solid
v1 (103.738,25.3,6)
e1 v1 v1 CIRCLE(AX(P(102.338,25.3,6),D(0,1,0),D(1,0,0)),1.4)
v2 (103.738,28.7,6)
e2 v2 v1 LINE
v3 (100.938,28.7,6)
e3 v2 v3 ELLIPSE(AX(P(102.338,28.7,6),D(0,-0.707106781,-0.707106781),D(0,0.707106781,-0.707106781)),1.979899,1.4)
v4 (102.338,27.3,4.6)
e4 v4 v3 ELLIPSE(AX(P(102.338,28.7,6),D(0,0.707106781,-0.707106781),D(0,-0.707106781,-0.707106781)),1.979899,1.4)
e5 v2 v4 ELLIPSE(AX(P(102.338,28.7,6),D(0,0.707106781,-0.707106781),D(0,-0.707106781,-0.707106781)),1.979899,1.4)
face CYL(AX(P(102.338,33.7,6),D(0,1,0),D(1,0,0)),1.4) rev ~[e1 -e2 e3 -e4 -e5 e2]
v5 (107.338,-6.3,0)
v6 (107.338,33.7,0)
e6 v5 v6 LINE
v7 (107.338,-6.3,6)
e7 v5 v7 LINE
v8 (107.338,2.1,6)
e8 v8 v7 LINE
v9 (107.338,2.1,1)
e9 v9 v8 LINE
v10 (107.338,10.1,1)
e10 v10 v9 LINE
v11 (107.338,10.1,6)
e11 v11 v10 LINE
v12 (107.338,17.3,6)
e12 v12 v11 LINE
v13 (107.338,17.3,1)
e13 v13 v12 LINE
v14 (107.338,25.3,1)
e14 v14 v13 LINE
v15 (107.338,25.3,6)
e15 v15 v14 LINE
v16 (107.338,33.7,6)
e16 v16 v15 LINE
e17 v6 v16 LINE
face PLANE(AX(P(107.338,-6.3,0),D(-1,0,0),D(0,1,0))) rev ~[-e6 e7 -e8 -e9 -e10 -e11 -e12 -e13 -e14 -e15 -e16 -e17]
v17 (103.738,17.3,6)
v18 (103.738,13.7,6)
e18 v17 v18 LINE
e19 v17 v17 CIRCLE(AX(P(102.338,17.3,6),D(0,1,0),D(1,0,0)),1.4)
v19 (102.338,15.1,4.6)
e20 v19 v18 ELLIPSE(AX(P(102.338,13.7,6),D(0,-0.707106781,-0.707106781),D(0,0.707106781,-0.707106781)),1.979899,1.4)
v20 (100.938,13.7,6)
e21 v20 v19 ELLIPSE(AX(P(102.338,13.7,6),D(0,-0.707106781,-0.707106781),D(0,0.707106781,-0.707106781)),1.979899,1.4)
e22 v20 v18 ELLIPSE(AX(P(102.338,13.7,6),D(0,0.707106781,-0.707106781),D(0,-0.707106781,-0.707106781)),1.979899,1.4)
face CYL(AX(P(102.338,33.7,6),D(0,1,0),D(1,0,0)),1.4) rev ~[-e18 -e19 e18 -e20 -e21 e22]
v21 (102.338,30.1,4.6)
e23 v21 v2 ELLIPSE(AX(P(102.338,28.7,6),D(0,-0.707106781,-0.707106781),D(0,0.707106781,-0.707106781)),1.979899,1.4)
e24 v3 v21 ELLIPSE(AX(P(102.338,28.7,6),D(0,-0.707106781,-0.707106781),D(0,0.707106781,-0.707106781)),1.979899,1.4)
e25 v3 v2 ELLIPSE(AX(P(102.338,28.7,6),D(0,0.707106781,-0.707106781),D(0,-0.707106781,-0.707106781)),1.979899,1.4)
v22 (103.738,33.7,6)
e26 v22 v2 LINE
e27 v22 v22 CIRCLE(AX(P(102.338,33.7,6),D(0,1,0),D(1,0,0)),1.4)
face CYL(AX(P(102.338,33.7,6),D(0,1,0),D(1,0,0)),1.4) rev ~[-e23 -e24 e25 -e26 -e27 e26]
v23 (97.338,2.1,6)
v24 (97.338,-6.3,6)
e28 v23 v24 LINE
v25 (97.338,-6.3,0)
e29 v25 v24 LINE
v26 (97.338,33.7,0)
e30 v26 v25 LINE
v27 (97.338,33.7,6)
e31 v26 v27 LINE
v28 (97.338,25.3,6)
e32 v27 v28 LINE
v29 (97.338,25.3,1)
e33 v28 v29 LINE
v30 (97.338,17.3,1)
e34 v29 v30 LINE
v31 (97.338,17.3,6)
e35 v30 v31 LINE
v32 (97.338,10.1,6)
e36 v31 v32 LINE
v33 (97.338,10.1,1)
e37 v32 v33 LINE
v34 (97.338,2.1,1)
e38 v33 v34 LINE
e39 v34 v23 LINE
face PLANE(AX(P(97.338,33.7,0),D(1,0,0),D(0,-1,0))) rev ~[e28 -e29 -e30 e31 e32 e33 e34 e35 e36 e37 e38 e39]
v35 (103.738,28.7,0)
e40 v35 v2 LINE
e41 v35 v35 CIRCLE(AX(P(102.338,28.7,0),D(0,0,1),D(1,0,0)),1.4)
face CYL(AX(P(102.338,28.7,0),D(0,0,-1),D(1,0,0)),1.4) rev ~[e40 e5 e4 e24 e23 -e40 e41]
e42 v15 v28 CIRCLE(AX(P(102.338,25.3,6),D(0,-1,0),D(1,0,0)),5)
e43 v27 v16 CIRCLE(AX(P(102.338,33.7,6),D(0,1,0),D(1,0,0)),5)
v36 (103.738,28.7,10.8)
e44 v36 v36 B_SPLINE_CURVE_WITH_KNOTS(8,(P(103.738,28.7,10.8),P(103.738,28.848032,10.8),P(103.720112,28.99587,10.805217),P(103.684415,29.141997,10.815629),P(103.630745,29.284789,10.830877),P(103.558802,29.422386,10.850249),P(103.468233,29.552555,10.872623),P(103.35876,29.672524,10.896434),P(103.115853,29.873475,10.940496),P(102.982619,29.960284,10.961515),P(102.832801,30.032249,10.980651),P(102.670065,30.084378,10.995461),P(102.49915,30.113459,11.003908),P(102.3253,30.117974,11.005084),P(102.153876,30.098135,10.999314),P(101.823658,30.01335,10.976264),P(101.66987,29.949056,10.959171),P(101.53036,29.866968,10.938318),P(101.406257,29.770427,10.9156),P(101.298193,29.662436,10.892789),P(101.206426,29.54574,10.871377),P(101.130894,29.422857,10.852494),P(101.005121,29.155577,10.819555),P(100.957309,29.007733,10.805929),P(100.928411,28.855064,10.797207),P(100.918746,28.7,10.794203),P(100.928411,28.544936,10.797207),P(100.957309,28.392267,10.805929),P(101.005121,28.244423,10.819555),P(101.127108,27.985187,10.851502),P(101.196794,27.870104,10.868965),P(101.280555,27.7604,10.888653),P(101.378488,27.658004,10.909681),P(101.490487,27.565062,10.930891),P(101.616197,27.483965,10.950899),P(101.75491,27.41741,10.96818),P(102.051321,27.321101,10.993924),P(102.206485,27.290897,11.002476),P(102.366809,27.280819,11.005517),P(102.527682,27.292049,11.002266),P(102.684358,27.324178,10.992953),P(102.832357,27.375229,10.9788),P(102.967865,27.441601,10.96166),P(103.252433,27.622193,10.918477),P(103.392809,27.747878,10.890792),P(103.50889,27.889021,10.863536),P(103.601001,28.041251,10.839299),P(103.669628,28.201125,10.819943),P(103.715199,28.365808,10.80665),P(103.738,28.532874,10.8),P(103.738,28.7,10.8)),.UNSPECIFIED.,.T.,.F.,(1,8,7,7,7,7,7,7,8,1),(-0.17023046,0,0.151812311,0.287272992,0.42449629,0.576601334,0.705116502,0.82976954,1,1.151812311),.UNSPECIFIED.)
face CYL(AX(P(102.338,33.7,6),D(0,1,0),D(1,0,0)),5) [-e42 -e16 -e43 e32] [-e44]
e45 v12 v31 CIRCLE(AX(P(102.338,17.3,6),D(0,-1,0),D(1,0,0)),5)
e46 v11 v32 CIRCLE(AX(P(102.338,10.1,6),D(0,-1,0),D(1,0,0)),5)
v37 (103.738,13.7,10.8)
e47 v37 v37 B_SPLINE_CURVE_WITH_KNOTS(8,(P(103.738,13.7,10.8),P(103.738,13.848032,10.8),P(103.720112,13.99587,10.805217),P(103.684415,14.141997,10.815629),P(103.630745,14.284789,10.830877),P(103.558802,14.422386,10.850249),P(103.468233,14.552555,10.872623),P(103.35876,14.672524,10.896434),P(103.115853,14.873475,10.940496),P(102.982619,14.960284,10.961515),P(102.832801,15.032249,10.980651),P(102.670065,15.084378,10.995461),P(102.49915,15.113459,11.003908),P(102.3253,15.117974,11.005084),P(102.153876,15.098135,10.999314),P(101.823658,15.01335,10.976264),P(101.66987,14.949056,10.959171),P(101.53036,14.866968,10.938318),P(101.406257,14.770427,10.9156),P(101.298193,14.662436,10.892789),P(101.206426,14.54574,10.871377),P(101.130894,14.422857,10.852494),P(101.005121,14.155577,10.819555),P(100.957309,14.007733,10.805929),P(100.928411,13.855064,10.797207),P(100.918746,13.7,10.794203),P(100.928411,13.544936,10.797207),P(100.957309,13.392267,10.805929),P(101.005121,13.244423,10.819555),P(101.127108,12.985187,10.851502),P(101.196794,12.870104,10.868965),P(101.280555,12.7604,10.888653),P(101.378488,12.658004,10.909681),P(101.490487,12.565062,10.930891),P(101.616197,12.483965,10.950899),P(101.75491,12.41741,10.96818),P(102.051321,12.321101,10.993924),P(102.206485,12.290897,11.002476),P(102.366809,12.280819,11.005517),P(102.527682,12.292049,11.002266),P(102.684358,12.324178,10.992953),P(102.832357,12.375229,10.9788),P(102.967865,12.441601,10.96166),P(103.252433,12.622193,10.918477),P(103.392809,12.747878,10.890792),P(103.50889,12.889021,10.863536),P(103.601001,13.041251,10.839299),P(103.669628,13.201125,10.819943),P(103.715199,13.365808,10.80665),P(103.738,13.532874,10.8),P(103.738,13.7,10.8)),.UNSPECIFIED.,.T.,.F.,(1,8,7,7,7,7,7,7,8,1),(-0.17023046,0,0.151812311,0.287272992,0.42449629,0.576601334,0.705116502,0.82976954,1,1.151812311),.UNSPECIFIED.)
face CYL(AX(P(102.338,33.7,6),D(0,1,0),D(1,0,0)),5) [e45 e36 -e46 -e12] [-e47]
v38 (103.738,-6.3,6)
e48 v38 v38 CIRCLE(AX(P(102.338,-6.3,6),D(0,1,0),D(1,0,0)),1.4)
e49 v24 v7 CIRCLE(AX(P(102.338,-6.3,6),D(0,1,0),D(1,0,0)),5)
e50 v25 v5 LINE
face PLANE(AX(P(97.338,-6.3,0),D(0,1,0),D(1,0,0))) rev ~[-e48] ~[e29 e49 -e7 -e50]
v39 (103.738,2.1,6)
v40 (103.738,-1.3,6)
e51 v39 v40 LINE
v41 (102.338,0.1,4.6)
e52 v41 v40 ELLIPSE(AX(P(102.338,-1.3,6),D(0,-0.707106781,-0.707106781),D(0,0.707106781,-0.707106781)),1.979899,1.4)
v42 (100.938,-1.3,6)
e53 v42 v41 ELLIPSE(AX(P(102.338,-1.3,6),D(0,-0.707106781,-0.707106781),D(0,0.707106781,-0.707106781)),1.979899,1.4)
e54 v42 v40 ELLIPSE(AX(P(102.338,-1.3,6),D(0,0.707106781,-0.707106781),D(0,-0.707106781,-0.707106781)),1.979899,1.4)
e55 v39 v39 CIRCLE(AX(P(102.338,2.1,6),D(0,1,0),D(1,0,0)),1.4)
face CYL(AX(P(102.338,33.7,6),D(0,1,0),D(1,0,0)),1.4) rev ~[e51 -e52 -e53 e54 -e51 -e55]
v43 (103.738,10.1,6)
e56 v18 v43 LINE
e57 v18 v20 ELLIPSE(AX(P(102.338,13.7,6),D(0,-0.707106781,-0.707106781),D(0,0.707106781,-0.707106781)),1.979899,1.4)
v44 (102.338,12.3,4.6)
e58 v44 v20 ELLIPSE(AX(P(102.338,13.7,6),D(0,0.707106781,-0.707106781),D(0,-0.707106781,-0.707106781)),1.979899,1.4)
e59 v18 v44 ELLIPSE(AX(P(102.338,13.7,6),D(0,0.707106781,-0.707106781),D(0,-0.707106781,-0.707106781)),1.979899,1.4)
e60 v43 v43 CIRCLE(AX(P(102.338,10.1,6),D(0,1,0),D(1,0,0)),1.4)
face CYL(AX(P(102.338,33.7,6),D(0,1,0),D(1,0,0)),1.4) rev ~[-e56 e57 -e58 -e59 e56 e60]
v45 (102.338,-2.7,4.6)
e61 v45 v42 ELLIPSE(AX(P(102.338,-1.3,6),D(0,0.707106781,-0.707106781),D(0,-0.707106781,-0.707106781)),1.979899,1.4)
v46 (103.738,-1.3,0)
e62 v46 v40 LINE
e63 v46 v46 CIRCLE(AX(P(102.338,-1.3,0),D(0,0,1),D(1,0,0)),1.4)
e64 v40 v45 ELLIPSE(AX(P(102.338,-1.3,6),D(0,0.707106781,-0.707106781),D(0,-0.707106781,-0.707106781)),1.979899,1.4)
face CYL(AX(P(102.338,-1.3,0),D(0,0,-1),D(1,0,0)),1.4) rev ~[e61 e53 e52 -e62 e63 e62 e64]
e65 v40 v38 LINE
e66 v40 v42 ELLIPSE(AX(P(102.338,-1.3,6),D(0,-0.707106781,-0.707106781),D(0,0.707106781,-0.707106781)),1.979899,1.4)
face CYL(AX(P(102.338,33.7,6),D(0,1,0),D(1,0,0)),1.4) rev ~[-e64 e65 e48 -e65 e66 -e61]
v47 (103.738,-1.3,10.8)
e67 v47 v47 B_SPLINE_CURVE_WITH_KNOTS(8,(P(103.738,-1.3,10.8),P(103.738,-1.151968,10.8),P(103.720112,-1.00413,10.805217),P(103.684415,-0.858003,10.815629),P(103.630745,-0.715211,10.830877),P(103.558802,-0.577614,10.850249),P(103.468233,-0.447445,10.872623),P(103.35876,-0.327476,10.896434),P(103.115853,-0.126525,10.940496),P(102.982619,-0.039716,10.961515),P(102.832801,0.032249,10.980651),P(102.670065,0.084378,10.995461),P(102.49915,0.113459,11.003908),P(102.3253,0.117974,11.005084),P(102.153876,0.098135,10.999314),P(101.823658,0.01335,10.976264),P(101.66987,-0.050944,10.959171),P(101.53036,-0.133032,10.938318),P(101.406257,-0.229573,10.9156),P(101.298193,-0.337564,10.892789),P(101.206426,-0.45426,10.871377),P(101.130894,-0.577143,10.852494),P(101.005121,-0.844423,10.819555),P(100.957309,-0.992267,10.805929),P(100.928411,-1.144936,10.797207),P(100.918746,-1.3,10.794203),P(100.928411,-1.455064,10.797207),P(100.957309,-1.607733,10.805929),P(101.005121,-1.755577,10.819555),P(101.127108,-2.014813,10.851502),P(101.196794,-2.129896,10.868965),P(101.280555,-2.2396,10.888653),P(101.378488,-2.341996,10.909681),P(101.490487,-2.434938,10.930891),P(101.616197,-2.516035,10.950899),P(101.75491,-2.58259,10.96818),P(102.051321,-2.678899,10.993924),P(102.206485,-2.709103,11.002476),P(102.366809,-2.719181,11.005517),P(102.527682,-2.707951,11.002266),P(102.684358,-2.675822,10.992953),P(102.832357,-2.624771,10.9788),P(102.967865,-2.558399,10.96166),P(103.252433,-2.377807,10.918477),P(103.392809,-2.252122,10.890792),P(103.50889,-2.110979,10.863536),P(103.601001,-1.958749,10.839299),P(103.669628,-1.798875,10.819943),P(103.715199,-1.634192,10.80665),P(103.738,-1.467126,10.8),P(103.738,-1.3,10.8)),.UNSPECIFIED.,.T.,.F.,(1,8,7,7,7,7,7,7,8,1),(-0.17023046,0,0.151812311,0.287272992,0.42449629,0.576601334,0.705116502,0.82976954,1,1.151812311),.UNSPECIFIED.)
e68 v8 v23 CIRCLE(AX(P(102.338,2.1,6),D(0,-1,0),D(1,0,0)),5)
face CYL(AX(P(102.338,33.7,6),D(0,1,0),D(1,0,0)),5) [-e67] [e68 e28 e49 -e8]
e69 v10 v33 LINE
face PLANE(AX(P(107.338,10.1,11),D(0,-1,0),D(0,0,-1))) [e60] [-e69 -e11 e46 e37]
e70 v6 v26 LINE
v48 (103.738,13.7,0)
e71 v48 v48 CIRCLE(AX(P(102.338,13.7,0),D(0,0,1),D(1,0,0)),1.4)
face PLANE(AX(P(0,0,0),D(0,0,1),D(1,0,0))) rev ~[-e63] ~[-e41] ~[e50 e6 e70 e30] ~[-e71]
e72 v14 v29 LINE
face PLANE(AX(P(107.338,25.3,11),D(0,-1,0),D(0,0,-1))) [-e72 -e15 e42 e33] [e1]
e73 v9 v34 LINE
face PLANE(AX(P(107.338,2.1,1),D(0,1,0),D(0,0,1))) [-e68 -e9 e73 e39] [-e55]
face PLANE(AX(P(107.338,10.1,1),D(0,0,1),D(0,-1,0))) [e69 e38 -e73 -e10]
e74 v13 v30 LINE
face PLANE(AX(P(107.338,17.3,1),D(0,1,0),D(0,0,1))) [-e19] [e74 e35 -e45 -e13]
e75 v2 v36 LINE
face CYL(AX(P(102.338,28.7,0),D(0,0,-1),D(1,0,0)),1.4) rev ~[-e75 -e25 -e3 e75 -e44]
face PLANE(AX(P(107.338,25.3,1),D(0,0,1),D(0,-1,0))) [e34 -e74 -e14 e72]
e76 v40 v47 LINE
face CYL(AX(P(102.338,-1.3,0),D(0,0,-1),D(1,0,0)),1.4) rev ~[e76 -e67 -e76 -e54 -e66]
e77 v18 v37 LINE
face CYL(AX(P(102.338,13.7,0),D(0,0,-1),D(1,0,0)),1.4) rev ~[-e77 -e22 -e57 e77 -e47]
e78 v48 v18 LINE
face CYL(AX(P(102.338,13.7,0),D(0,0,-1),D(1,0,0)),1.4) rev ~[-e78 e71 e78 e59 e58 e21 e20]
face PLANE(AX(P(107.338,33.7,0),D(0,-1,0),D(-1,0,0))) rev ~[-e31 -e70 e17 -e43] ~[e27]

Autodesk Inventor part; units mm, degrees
ref_plane "YZ Plane" through (0, 0, 0) normal (1, 0, 0) x (0, 1, 0)
ref_plane "XZ Plane" through (0, 0, 0) normal (0, 1, 0) x (-1, 0, 0)
ref_plane "XY Plane" through (0, 0, 0) normal (0, 0, 1) x (1, 0, 0)
ref_plane "Arbeitsebene1" through (0, 0, 0) normal (0, 0, 1) x (1, 0, 0)
sketch "Skizze1" plane through (0, 0, 0) normal (0, 0, 1) x (1, 0, 0)
  line L0 (-118.5, -74.5) -> (-118.5, 74.5) projected
  arc A0 (-118.5, -74.5) -> (-103.5, -89.5) centre (-103.5, -74.5) ccw projected
  line L1 (56.1, -89.5) -> (-103.5, -89.5) projected
  line L2 (56.1, -83) -> (56.1, -89.5) projected
  arc A1 (71.1, -68) -> (56.1, -83) centre (71.1, -83) ccw projected
  line L3 (80.5, -68) -> (71.1, -68) projected
  arc A2 (95.5, -83) -> (80.5, -68) centre (80.5, -83) ccw projected
  line L4 (95.5, -89.5) -> (95.5, -83) projected
  line L5 (103.5, -89.5) -> (95.5, -89.5) projected
  arc A3 (103.5, -89.5) -> (118.5, -74.5) centre (103.5, -74.5) ccw projected
  line L6 (118.5, 74.5) -> (118.5, -74.5) projected
  arc A4 (118.5, 74.5) -> (103.5, 89.5) centre (103.5, 74.5) ccw projected
  line L7 (-103.5, 89.5) -> (103.5, 89.5) projected
  arc A5 (-103.5, 89.5) -> (-118.5, 74.5) centre (-103.5, 74.5) ccw projected
  circle A6 centre (-58.5, 18.7) radius 1.4 projected
  circle A7 centre (-58.5, 36.552) radius 1.4 projected
  circle A8 centre (57.5, 20.252) radius 1.4 projected
  circle A9 centre (57.5, 35) radius 1.4 projected
  circle A10 centre (-58.5, 8.7) radius 1.4 projected
  circle A11 centre (-58.5, -9.152) radius 1.4 projected
  circle A12 centre (57.5, 7.148) radius 1.4 projected
  circle A13 centre (57.5, -7.6) radius 1.4 projected
  circle A14 centre (103.5, 74.5) radius 1.4 projected
  circle A15 centre (103.5, -74.5) radius 1.4 projected
  circle A16 centre (-103.5, -74.5) radius 1.4 projected
  circle A17 centre (-103.5, 74.5) radius 1.4 projected
  line L8 (20.9567, 0.5738) -> (-20.9567, 0.5738) projected
  line L9 (-20.9567, 0.5738) -> (-20.9567, 30.6837) projected
  line L10 (-20.9567, 30.6837) -> (20.9567, 30.6837) projected
  line L11 (20.9567, 30.6837) -> (20.9567, 0.5738) projected
  circle A18 centre (73.1917, -22.4328) radius 1.4 projected
  circle A19 centre (43.1917, -22.4328) radius 1.4 projected
  circle A20 centre (13.1917, -22.4328) radius 1.4 projected
  circle A21 centre (-16.8083, -22.4328) radius 1.4 projected
  circle A22 centre (-46.8083, -22.4328) radius 1.4 projected
  circle A23 centre (-102.338, -1.3) radius 1.4 projected
  circle A24 centre (-102.338, 13.7) radius 1.4 projected
  circle A25 centre (-102.338, 28.7) radius 1.4 projected
  circle A26 centre (102.338, 28.7) radius 1.4 projected
  circle A27 centre (-73.1917, -22.4328) radius 1.4 projected
  circle A28 centre (-43.1917, -22.4328) radius 1.4 projected
  circle A29 centre (-13.1917, -22.4328) radius 1.4 projected
  circle A30 centre (16.8083, -22.4328) radius 1.4 projected
  circle A31 centre (46.8083, -22.4328) radius 1.4 projected
  circle A32 centre (102.338, -1.3) radius 1.4 projected
  circle A33 centre (102.338, 13.7) radius 1.4 projected
  line L12 (97.338, -6.3) -> (107.338, -6.3)
  line L13 (107.338, -6.3) -> (107.338, 33.7)
  line L14 (107.338, 33.7) -> (97.338, 33.7)
  line L15 (97.338, 33.7) -> (97.338, -6.3)
  line L16 (97.338, -6.3) -> (107.338, 33.7) construction
  line L17 (107.338, -6.3) -> (97.338, 33.7) construction
  line L18 (76.5043, -50) -> (76.5043, 50) projected
  arc A34 (96.5043, 50) -> (76.5043, 50) centre (86.5043, 50) ccw projected
  line L19 (96.5043, 50) -> (96.5043, -50) projected
  arc A35 (76.5043, -50) -> (96.5043, -50) centre (86.5043, -50) ccw projected
  line L20 (-95.8131, -50) -> (-95.8131, 50) projected
  arc A36 (-75.8131, 50) -> (-95.8131, 50) centre (-85.8131, 50) ccw projected
  line L21 (-75.8131, 50) -> (-75.8131, -50) projected
  arc A37 (-95.8131, -50) -> (-75.8131, -50) centre (-85.8131, -50) ccw projected
  circle A38 centre (-108.5, 79.5) radius 1.4 projected
  circle A39 centre (-108.5, -79.5) radius 1.4 projected
  circle A40 centre (108.5, 79.5) radius 1.4 projected
  circle A41 centre (108.5, -79.5) radius 1.4 projected
  point P0 (0, 0)
  dimension "d0" = 10
  dimension "d1" = 40
extrude "Extrusion1" add sketch "Skizze1" along normal blind 50 contours L15 L14 L13 L12
fillet "Rundung1" radius 5 2 edges at (102.338, -6.3, 50) (102.338, 33.7, 50)
sketch "Skizze2" plane through (97.338, 33.7, 0) normal (0, 1, 0) x (1, 0, 0)
  line L0 (10, -45) -> (0, -45) projected
  line L1 (10, 0) -> (10, -45) projected
  line L2 (10, 0) -> (0, 0) projected
  line L3 (0, 0) -> (0, -45) projected
  circle A0 centre (5, -6) radius 5
  line L4 (10, 0) -> (10, -45) projected
  circle A1 centre (5, -6) radius 1.4
  point P0 (-97.338, 0)
  point P1 (0, -6)
  point P2 (10, -6)
  dimension "d5" = 6
  dimension "d8" = 2.8
extrude "Extrusion2" cut sketch "Skizze2" against normal through all contours A0 L3 L2 L1 | A0 keep common part
sketch "Skizze3" plane through (107.338, -6.3, 0) normal (1, 0, 0) x (0, 0, -1)
  line L0 (0, 40) -> (-6, 40) projected
  line L1 (0, 0) -> (-6, 0) projected
  line L2 (-4.6, 33.6) -> (0, 33.6) projected
  line L3 (-4.6, 21.4) -> (0, 21.4) projected
  line L4 (-4.6, 18.6) -> (0, 18.6) projected
  line L5 (-4.6, 6.4) -> (0, 6.4) projected
  line L6 (-4.6, 3.6) -> (0, 3.6) projected
  line L7 (-4.6, 36.4) -> (0, 36.4) projected
  line L8 (-11, 40) -> (-11, 0) projected
  line L9 (-11, 31.6) -> (-1, 31.6)
  line L10 (-1, 31.6) -> (-1, 23.6)
  line L11 (-1, 23.6) -> (-11, 23.6)
  line L12 (-11, 23.6) -> (-11, 31.6)
  line L13 (-11, 16.4) -> (-1, 16.4)
  line L14 (-1, 16.4) -> (-1, 8.4)
  line L15 (-1, 8.4) -> (-11, 8.4)
  line L16 (-11, 8.4) -> (-11, 16.4)
  point P0 (0, 6.3)
  point P1 (-11, 8.4)
  point P2 (-11, 23.6)
  dimension "d9" = 10
  dimension "d10" = 8
  dimension "d11" = 10
  dimension "d12" = 8
  dimension "d13" = 2
  dimension "d14" = 2.2
extrude "Extrusion3" cut sketch "Skizze3" against normal blind 10
properties part number "60_Planktoscope_Illuminationsource"
